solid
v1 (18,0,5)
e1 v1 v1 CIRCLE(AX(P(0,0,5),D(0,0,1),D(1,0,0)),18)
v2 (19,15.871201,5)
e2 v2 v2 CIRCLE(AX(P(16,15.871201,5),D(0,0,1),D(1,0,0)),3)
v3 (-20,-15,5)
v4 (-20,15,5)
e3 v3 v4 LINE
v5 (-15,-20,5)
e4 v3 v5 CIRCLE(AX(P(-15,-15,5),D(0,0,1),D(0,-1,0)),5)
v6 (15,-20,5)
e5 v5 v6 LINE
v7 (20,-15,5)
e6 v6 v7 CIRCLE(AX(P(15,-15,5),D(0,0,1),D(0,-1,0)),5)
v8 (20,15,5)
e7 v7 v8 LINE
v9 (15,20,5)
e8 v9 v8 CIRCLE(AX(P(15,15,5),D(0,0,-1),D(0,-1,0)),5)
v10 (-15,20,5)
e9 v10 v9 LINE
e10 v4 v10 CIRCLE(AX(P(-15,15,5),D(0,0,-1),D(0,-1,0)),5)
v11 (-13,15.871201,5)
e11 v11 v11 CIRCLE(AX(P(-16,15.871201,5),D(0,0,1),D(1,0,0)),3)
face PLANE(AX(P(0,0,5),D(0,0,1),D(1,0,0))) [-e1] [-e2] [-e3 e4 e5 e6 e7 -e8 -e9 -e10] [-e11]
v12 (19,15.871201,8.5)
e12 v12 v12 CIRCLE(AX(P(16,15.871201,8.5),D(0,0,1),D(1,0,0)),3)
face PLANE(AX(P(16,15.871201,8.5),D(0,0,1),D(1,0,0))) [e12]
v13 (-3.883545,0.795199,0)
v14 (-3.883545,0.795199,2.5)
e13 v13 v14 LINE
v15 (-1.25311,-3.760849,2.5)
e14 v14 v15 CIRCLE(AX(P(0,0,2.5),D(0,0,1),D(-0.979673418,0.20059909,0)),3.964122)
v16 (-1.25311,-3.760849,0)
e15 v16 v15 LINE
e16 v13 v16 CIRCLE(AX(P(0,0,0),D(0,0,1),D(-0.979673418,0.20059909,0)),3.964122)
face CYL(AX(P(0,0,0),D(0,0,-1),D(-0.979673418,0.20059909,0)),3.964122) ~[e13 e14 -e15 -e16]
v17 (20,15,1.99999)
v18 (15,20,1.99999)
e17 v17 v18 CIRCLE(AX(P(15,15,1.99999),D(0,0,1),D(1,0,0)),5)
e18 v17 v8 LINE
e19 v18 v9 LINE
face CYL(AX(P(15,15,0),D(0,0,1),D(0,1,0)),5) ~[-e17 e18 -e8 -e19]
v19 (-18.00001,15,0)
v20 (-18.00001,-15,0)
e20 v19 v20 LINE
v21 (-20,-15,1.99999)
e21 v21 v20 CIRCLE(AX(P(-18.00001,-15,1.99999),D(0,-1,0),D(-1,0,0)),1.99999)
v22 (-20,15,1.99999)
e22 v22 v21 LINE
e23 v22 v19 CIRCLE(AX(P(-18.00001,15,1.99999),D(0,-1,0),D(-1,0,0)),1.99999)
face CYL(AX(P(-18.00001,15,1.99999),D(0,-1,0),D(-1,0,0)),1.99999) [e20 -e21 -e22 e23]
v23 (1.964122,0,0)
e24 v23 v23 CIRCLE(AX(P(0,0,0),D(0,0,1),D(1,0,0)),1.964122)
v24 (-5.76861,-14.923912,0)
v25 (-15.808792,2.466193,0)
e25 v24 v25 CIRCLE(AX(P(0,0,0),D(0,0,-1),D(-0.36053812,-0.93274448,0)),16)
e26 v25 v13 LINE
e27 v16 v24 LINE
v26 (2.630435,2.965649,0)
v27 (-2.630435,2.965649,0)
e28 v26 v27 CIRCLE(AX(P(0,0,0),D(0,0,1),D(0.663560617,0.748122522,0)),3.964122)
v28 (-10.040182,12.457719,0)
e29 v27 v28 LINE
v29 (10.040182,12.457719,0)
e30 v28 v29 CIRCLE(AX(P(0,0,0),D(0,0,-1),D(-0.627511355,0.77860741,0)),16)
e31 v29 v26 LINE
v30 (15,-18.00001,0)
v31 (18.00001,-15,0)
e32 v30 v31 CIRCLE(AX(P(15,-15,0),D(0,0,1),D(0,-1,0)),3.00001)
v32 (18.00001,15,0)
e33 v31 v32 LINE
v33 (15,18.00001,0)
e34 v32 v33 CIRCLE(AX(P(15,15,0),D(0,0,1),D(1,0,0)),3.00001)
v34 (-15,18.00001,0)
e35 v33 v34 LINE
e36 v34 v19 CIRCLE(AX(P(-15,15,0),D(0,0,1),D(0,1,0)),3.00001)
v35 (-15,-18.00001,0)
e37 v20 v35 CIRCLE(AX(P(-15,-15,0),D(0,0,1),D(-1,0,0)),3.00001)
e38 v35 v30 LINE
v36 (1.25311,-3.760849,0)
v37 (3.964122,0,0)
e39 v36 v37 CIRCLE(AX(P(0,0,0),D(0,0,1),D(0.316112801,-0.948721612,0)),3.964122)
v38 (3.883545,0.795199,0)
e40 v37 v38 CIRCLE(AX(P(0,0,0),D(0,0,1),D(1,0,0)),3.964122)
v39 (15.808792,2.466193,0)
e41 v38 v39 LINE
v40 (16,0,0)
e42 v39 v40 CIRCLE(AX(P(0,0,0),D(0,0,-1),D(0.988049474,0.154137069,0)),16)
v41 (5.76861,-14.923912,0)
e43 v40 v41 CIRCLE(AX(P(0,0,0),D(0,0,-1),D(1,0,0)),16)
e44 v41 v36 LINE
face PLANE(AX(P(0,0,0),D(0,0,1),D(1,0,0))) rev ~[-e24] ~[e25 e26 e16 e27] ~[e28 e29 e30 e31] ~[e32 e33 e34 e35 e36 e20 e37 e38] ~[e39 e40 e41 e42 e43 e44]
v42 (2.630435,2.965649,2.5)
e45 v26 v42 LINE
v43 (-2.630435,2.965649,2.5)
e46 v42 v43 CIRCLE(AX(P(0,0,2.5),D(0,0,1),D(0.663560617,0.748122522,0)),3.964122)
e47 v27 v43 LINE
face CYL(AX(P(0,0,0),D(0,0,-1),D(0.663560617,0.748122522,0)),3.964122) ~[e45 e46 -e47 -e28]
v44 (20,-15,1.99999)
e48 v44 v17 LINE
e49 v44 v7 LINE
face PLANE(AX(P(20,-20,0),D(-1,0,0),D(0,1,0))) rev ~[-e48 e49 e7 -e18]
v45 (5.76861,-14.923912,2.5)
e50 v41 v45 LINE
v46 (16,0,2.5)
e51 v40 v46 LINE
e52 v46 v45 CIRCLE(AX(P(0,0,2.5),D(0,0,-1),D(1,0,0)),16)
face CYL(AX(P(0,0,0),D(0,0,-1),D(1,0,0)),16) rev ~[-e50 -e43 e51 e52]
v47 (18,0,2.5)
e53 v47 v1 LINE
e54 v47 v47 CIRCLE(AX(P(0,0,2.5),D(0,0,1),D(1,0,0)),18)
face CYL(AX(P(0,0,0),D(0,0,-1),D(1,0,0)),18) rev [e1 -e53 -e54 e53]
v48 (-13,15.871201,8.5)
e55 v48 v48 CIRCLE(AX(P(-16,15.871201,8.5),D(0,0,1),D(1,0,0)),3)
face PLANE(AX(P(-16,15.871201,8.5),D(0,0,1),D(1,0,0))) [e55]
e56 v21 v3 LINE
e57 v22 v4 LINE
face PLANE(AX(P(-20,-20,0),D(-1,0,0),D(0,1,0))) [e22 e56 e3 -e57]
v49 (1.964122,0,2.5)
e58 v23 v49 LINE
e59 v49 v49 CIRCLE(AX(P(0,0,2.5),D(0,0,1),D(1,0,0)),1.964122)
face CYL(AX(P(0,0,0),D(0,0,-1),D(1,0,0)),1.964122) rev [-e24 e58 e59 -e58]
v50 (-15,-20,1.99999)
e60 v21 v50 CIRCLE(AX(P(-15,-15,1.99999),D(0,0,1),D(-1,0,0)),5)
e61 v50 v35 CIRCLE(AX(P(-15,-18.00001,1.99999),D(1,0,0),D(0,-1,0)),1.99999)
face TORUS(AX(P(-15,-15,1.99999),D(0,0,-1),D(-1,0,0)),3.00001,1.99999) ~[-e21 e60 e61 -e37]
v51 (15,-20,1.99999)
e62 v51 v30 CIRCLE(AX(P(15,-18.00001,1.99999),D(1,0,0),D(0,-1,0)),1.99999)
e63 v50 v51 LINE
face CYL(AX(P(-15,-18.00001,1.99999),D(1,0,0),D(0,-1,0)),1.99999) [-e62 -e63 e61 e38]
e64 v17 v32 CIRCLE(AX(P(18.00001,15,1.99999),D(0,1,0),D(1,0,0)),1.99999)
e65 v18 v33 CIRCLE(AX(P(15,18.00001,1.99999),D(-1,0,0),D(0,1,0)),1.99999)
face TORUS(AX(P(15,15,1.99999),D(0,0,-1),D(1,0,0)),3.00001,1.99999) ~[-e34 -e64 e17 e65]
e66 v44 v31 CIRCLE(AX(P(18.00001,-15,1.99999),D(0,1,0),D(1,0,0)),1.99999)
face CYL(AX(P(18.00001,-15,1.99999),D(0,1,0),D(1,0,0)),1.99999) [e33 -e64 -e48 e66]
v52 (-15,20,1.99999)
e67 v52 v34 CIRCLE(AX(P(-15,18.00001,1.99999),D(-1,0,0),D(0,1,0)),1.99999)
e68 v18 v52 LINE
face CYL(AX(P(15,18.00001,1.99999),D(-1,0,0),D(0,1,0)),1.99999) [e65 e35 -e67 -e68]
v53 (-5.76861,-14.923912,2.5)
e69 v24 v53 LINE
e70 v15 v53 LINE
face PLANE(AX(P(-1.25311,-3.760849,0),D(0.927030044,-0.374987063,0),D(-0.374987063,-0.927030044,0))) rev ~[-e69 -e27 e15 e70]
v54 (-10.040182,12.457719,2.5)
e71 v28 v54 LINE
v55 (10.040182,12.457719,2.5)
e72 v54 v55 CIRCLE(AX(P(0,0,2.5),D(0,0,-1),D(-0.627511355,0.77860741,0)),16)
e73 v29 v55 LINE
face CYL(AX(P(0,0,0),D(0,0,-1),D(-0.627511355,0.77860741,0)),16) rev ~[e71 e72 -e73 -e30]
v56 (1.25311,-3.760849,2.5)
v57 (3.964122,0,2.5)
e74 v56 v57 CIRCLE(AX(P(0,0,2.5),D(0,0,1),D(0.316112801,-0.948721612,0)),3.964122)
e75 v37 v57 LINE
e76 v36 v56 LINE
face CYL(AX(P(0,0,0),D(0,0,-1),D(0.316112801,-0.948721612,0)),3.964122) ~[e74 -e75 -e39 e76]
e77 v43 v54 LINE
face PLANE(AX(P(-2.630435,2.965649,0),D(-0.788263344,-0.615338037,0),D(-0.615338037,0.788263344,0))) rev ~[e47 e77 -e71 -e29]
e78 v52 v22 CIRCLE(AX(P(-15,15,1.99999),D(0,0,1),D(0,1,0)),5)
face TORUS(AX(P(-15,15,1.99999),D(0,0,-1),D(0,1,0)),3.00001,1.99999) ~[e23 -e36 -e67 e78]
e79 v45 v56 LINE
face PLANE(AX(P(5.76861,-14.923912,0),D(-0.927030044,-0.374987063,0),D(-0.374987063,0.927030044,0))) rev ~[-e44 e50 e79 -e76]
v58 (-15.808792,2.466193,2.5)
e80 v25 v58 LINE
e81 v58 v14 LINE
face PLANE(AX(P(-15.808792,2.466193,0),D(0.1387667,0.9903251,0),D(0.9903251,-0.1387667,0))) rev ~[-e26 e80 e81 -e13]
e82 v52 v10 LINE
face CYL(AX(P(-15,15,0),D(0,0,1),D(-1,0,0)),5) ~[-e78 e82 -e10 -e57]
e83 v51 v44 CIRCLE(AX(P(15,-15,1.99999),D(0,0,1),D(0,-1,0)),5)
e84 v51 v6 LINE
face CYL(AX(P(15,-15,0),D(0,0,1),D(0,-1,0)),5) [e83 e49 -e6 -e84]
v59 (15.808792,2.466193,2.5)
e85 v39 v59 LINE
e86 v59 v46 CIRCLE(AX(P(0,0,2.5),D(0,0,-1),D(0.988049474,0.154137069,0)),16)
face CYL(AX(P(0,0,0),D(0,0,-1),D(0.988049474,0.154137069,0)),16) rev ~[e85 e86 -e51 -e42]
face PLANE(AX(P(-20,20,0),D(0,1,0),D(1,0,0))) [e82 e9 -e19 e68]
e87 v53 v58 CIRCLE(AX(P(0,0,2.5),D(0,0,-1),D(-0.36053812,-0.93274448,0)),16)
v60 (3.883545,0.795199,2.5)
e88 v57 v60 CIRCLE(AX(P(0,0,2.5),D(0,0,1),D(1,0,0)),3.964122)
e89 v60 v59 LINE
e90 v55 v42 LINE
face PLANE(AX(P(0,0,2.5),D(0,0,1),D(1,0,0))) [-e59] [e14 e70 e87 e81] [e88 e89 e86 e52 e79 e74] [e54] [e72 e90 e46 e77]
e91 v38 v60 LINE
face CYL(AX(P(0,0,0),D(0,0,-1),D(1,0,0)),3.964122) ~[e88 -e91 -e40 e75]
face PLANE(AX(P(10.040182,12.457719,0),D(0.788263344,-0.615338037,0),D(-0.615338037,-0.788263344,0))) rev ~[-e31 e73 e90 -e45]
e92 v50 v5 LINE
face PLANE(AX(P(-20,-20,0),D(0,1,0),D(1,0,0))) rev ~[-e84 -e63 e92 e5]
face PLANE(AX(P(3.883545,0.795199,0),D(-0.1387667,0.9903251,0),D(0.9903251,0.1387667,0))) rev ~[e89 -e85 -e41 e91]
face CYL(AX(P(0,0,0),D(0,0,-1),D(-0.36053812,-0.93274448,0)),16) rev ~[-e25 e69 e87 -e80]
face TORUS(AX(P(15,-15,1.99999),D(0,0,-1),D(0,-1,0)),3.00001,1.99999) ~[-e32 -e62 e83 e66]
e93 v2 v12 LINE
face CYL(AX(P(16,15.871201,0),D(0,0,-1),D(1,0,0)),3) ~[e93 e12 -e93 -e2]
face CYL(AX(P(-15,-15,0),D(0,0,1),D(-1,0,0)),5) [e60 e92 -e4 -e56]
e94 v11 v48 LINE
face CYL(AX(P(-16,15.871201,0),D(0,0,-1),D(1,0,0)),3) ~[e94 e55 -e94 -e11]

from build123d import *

# Parameters (mm, degrees)
F0_W     = 40
F0_H     = 40
F0_R     = 3
F0_R_2   = 18
F1_DEPTH = 5
F2_DEPTH = 8.5
F3_R     = 5
F4_R     = 1.99999
F0_R_3   = 1.96412235
F5_DEPTH = 2.5


# Not quite as in the source:
# - a fillet or chamfer is up to 0.001 mm smaller than in the source, because OpenCascade refuses the exact size


with BuildPart() as f1:
    # F0 (on Top) → F1 (new body)
    with BuildSketch(Plane.XY):
        Rectangle(F0_W, F0_H)
        with Locations((-16, 15.8712012513)):
            Circle(F0_R, mode=Mode.SUBTRACT)
        Circle(F0_R_2, mode=Mode.SUBTRACT)
        with Locations((16, 15.8712012513)):
            Circle(F0_R, mode=Mode.SUBTRACT)
    extrude(amount=F1_DEPTH)

    # F0 (on Top) → F2 (join)
    with BuildSketch(Plane.XY):
        with Locations((-16, 15.8712012513)):
            Circle(F0_R)
        with Locations((16, 15.8712012513)):
            Circle(F0_R)
    extrude(amount=F2_DEPTH)

    # F3
    f3_edges = [f1.edges().sort_by_distance(p)[0] for p in [
        (-20, -20, 2.5),
        (-20, 20, 2.5),
        (20, -20, 2.5),
        (20, 20, 2.5),
    ]]
    fillet(f3_edges, radius=F3_R)

    # F4 (radius 2 in the source; OpenCascade refuses exactly that, so slightly less here)
    f4_edges = [f1.edges().sort_by_distance(p)[0] for p in [
        (20, 0, 0),
    ]]
    fillet(f4_edges, radius=F4_R)

    # F0 (on Top) → F5 (join)
    with BuildSketch(Plane.XY):
        Circle(F0_R_2)
        with BuildLine():
            ThreePointArc((15.8087915907, 2.4661931072), (15.952126276, 1.236797184), (16, 0))
            ThreePointArc((16, 0), (13.1965480074, -9.0471609187), (5.7686099139, -14.9239116743))
            ThreePointArc((5.7686099139, -14.9239116743), (0, -16), (-5.7686099139, -14.9239116743))
            ThreePointArc((-5.7686099139, -14.9239116743), (-13.8564064606, -8), (-15.8087915907, 2.4661931072))
            ThreePointArc((-15.8087915907, 2.4661931072), (-13.8564064606, 8), (-10.0401816768, 12.4577185671))
            ThreePointArc((-10.0401816768, 12.4577185671), (0, 16), (10.0401816768, 12.4577185671))
            ThreePointArc((10.0401816768, 12.4577185671), (13.8564064606, 8), (15.8087915907, 2.4661931072))
        make_face(mode=Mode.SUBTRACT)
        with BuildLine():
            ThreePointArc((3.96412235, 0), (3.9439266403, 0.3996356611), (3.8835452903, 0.795199336))
            ThreePointArc((3.8835452903, 0.795199336), (3.4330306588, 1.982061175), (2.6304354712, 2.9656492102))
            ThreePointArc((2.6304354712, 2.9656492102), (0, 3.96412235), (-2.6304354712, 2.9656492102))
            ThreePointArc((-2.6304354712, 2.9656492102), (-3.4330306588, 1.982061175), (-3.8835452903, 0.795199336))
            ThreePointArc((-3.8835452903, 0.795199336), (-3.4330306588, -1.982061175), (-1.2531098191, -3.7608485461))
            ThreePointArc((-1.2531098191, -3.7608485461), (0, -3.96412235), (1.2531098191, -3.7608485461))
            ThreePointArc((1.2531098191, -3.7608485461), (3.2157228306, -2.3180579549), (3.96412235, 0))
        make_face()
        Circle(F0_R_3, mode=Mode.SUBTRACT)
        with BuildLine():
            ThreePointArc((-5.7686099139, -14.9239116743), (0, -16), (5.7686099139, -14.9239116743))
            Line((5.7686099139, -14.9239116743), (1.2531098191, -3.7608485461))
            ThreePointArc((1.2531098191, -3.7608485461), (0, -3.96412235), (-1.2531098191, -3.7608485461))
            Line((-1.2531098191, -3.7608485461), (-5.7686099139, -14.9239116743))
        make_face()
        with BuildLine():
            Line((3.8835452903, 0.795199336), (15.8087915907, 2.4661931072))
            ThreePointArc((15.8087915907, 2.4661931072), (13.8564064606, 8), (10.0401816768, 12.4577185671))
            Line((10.0401816768, 12.4577185671), (2.6304354712, 2.9656492102))
            ThreePointArc((2.6304354712, 2.9656492102), (3.4330306588, 1.982061175), (3.8835452903, 0.795199336))
        make_face()
        with BuildLine():
            Line((-2.6304354712, 2.9656492102), (-10.0401816768, 12.4577185671))
            ThreePointArc((-10.0401816768, 12.4577185671), (-13.8564064606, 8), (-15.8087915907, 2.4661931072))
            Line((-15.8087915907, 2.4661931072), (-3.8835452903, 0.795199336))
            ThreePointArc((-3.8835452903, 0.795199336), (-3.4330306588, 1.982061175), (-2.6304354712, 2.9656492102))
        make_face()
    extrude(amount=F5_DEPTH)


solid = f1.part
